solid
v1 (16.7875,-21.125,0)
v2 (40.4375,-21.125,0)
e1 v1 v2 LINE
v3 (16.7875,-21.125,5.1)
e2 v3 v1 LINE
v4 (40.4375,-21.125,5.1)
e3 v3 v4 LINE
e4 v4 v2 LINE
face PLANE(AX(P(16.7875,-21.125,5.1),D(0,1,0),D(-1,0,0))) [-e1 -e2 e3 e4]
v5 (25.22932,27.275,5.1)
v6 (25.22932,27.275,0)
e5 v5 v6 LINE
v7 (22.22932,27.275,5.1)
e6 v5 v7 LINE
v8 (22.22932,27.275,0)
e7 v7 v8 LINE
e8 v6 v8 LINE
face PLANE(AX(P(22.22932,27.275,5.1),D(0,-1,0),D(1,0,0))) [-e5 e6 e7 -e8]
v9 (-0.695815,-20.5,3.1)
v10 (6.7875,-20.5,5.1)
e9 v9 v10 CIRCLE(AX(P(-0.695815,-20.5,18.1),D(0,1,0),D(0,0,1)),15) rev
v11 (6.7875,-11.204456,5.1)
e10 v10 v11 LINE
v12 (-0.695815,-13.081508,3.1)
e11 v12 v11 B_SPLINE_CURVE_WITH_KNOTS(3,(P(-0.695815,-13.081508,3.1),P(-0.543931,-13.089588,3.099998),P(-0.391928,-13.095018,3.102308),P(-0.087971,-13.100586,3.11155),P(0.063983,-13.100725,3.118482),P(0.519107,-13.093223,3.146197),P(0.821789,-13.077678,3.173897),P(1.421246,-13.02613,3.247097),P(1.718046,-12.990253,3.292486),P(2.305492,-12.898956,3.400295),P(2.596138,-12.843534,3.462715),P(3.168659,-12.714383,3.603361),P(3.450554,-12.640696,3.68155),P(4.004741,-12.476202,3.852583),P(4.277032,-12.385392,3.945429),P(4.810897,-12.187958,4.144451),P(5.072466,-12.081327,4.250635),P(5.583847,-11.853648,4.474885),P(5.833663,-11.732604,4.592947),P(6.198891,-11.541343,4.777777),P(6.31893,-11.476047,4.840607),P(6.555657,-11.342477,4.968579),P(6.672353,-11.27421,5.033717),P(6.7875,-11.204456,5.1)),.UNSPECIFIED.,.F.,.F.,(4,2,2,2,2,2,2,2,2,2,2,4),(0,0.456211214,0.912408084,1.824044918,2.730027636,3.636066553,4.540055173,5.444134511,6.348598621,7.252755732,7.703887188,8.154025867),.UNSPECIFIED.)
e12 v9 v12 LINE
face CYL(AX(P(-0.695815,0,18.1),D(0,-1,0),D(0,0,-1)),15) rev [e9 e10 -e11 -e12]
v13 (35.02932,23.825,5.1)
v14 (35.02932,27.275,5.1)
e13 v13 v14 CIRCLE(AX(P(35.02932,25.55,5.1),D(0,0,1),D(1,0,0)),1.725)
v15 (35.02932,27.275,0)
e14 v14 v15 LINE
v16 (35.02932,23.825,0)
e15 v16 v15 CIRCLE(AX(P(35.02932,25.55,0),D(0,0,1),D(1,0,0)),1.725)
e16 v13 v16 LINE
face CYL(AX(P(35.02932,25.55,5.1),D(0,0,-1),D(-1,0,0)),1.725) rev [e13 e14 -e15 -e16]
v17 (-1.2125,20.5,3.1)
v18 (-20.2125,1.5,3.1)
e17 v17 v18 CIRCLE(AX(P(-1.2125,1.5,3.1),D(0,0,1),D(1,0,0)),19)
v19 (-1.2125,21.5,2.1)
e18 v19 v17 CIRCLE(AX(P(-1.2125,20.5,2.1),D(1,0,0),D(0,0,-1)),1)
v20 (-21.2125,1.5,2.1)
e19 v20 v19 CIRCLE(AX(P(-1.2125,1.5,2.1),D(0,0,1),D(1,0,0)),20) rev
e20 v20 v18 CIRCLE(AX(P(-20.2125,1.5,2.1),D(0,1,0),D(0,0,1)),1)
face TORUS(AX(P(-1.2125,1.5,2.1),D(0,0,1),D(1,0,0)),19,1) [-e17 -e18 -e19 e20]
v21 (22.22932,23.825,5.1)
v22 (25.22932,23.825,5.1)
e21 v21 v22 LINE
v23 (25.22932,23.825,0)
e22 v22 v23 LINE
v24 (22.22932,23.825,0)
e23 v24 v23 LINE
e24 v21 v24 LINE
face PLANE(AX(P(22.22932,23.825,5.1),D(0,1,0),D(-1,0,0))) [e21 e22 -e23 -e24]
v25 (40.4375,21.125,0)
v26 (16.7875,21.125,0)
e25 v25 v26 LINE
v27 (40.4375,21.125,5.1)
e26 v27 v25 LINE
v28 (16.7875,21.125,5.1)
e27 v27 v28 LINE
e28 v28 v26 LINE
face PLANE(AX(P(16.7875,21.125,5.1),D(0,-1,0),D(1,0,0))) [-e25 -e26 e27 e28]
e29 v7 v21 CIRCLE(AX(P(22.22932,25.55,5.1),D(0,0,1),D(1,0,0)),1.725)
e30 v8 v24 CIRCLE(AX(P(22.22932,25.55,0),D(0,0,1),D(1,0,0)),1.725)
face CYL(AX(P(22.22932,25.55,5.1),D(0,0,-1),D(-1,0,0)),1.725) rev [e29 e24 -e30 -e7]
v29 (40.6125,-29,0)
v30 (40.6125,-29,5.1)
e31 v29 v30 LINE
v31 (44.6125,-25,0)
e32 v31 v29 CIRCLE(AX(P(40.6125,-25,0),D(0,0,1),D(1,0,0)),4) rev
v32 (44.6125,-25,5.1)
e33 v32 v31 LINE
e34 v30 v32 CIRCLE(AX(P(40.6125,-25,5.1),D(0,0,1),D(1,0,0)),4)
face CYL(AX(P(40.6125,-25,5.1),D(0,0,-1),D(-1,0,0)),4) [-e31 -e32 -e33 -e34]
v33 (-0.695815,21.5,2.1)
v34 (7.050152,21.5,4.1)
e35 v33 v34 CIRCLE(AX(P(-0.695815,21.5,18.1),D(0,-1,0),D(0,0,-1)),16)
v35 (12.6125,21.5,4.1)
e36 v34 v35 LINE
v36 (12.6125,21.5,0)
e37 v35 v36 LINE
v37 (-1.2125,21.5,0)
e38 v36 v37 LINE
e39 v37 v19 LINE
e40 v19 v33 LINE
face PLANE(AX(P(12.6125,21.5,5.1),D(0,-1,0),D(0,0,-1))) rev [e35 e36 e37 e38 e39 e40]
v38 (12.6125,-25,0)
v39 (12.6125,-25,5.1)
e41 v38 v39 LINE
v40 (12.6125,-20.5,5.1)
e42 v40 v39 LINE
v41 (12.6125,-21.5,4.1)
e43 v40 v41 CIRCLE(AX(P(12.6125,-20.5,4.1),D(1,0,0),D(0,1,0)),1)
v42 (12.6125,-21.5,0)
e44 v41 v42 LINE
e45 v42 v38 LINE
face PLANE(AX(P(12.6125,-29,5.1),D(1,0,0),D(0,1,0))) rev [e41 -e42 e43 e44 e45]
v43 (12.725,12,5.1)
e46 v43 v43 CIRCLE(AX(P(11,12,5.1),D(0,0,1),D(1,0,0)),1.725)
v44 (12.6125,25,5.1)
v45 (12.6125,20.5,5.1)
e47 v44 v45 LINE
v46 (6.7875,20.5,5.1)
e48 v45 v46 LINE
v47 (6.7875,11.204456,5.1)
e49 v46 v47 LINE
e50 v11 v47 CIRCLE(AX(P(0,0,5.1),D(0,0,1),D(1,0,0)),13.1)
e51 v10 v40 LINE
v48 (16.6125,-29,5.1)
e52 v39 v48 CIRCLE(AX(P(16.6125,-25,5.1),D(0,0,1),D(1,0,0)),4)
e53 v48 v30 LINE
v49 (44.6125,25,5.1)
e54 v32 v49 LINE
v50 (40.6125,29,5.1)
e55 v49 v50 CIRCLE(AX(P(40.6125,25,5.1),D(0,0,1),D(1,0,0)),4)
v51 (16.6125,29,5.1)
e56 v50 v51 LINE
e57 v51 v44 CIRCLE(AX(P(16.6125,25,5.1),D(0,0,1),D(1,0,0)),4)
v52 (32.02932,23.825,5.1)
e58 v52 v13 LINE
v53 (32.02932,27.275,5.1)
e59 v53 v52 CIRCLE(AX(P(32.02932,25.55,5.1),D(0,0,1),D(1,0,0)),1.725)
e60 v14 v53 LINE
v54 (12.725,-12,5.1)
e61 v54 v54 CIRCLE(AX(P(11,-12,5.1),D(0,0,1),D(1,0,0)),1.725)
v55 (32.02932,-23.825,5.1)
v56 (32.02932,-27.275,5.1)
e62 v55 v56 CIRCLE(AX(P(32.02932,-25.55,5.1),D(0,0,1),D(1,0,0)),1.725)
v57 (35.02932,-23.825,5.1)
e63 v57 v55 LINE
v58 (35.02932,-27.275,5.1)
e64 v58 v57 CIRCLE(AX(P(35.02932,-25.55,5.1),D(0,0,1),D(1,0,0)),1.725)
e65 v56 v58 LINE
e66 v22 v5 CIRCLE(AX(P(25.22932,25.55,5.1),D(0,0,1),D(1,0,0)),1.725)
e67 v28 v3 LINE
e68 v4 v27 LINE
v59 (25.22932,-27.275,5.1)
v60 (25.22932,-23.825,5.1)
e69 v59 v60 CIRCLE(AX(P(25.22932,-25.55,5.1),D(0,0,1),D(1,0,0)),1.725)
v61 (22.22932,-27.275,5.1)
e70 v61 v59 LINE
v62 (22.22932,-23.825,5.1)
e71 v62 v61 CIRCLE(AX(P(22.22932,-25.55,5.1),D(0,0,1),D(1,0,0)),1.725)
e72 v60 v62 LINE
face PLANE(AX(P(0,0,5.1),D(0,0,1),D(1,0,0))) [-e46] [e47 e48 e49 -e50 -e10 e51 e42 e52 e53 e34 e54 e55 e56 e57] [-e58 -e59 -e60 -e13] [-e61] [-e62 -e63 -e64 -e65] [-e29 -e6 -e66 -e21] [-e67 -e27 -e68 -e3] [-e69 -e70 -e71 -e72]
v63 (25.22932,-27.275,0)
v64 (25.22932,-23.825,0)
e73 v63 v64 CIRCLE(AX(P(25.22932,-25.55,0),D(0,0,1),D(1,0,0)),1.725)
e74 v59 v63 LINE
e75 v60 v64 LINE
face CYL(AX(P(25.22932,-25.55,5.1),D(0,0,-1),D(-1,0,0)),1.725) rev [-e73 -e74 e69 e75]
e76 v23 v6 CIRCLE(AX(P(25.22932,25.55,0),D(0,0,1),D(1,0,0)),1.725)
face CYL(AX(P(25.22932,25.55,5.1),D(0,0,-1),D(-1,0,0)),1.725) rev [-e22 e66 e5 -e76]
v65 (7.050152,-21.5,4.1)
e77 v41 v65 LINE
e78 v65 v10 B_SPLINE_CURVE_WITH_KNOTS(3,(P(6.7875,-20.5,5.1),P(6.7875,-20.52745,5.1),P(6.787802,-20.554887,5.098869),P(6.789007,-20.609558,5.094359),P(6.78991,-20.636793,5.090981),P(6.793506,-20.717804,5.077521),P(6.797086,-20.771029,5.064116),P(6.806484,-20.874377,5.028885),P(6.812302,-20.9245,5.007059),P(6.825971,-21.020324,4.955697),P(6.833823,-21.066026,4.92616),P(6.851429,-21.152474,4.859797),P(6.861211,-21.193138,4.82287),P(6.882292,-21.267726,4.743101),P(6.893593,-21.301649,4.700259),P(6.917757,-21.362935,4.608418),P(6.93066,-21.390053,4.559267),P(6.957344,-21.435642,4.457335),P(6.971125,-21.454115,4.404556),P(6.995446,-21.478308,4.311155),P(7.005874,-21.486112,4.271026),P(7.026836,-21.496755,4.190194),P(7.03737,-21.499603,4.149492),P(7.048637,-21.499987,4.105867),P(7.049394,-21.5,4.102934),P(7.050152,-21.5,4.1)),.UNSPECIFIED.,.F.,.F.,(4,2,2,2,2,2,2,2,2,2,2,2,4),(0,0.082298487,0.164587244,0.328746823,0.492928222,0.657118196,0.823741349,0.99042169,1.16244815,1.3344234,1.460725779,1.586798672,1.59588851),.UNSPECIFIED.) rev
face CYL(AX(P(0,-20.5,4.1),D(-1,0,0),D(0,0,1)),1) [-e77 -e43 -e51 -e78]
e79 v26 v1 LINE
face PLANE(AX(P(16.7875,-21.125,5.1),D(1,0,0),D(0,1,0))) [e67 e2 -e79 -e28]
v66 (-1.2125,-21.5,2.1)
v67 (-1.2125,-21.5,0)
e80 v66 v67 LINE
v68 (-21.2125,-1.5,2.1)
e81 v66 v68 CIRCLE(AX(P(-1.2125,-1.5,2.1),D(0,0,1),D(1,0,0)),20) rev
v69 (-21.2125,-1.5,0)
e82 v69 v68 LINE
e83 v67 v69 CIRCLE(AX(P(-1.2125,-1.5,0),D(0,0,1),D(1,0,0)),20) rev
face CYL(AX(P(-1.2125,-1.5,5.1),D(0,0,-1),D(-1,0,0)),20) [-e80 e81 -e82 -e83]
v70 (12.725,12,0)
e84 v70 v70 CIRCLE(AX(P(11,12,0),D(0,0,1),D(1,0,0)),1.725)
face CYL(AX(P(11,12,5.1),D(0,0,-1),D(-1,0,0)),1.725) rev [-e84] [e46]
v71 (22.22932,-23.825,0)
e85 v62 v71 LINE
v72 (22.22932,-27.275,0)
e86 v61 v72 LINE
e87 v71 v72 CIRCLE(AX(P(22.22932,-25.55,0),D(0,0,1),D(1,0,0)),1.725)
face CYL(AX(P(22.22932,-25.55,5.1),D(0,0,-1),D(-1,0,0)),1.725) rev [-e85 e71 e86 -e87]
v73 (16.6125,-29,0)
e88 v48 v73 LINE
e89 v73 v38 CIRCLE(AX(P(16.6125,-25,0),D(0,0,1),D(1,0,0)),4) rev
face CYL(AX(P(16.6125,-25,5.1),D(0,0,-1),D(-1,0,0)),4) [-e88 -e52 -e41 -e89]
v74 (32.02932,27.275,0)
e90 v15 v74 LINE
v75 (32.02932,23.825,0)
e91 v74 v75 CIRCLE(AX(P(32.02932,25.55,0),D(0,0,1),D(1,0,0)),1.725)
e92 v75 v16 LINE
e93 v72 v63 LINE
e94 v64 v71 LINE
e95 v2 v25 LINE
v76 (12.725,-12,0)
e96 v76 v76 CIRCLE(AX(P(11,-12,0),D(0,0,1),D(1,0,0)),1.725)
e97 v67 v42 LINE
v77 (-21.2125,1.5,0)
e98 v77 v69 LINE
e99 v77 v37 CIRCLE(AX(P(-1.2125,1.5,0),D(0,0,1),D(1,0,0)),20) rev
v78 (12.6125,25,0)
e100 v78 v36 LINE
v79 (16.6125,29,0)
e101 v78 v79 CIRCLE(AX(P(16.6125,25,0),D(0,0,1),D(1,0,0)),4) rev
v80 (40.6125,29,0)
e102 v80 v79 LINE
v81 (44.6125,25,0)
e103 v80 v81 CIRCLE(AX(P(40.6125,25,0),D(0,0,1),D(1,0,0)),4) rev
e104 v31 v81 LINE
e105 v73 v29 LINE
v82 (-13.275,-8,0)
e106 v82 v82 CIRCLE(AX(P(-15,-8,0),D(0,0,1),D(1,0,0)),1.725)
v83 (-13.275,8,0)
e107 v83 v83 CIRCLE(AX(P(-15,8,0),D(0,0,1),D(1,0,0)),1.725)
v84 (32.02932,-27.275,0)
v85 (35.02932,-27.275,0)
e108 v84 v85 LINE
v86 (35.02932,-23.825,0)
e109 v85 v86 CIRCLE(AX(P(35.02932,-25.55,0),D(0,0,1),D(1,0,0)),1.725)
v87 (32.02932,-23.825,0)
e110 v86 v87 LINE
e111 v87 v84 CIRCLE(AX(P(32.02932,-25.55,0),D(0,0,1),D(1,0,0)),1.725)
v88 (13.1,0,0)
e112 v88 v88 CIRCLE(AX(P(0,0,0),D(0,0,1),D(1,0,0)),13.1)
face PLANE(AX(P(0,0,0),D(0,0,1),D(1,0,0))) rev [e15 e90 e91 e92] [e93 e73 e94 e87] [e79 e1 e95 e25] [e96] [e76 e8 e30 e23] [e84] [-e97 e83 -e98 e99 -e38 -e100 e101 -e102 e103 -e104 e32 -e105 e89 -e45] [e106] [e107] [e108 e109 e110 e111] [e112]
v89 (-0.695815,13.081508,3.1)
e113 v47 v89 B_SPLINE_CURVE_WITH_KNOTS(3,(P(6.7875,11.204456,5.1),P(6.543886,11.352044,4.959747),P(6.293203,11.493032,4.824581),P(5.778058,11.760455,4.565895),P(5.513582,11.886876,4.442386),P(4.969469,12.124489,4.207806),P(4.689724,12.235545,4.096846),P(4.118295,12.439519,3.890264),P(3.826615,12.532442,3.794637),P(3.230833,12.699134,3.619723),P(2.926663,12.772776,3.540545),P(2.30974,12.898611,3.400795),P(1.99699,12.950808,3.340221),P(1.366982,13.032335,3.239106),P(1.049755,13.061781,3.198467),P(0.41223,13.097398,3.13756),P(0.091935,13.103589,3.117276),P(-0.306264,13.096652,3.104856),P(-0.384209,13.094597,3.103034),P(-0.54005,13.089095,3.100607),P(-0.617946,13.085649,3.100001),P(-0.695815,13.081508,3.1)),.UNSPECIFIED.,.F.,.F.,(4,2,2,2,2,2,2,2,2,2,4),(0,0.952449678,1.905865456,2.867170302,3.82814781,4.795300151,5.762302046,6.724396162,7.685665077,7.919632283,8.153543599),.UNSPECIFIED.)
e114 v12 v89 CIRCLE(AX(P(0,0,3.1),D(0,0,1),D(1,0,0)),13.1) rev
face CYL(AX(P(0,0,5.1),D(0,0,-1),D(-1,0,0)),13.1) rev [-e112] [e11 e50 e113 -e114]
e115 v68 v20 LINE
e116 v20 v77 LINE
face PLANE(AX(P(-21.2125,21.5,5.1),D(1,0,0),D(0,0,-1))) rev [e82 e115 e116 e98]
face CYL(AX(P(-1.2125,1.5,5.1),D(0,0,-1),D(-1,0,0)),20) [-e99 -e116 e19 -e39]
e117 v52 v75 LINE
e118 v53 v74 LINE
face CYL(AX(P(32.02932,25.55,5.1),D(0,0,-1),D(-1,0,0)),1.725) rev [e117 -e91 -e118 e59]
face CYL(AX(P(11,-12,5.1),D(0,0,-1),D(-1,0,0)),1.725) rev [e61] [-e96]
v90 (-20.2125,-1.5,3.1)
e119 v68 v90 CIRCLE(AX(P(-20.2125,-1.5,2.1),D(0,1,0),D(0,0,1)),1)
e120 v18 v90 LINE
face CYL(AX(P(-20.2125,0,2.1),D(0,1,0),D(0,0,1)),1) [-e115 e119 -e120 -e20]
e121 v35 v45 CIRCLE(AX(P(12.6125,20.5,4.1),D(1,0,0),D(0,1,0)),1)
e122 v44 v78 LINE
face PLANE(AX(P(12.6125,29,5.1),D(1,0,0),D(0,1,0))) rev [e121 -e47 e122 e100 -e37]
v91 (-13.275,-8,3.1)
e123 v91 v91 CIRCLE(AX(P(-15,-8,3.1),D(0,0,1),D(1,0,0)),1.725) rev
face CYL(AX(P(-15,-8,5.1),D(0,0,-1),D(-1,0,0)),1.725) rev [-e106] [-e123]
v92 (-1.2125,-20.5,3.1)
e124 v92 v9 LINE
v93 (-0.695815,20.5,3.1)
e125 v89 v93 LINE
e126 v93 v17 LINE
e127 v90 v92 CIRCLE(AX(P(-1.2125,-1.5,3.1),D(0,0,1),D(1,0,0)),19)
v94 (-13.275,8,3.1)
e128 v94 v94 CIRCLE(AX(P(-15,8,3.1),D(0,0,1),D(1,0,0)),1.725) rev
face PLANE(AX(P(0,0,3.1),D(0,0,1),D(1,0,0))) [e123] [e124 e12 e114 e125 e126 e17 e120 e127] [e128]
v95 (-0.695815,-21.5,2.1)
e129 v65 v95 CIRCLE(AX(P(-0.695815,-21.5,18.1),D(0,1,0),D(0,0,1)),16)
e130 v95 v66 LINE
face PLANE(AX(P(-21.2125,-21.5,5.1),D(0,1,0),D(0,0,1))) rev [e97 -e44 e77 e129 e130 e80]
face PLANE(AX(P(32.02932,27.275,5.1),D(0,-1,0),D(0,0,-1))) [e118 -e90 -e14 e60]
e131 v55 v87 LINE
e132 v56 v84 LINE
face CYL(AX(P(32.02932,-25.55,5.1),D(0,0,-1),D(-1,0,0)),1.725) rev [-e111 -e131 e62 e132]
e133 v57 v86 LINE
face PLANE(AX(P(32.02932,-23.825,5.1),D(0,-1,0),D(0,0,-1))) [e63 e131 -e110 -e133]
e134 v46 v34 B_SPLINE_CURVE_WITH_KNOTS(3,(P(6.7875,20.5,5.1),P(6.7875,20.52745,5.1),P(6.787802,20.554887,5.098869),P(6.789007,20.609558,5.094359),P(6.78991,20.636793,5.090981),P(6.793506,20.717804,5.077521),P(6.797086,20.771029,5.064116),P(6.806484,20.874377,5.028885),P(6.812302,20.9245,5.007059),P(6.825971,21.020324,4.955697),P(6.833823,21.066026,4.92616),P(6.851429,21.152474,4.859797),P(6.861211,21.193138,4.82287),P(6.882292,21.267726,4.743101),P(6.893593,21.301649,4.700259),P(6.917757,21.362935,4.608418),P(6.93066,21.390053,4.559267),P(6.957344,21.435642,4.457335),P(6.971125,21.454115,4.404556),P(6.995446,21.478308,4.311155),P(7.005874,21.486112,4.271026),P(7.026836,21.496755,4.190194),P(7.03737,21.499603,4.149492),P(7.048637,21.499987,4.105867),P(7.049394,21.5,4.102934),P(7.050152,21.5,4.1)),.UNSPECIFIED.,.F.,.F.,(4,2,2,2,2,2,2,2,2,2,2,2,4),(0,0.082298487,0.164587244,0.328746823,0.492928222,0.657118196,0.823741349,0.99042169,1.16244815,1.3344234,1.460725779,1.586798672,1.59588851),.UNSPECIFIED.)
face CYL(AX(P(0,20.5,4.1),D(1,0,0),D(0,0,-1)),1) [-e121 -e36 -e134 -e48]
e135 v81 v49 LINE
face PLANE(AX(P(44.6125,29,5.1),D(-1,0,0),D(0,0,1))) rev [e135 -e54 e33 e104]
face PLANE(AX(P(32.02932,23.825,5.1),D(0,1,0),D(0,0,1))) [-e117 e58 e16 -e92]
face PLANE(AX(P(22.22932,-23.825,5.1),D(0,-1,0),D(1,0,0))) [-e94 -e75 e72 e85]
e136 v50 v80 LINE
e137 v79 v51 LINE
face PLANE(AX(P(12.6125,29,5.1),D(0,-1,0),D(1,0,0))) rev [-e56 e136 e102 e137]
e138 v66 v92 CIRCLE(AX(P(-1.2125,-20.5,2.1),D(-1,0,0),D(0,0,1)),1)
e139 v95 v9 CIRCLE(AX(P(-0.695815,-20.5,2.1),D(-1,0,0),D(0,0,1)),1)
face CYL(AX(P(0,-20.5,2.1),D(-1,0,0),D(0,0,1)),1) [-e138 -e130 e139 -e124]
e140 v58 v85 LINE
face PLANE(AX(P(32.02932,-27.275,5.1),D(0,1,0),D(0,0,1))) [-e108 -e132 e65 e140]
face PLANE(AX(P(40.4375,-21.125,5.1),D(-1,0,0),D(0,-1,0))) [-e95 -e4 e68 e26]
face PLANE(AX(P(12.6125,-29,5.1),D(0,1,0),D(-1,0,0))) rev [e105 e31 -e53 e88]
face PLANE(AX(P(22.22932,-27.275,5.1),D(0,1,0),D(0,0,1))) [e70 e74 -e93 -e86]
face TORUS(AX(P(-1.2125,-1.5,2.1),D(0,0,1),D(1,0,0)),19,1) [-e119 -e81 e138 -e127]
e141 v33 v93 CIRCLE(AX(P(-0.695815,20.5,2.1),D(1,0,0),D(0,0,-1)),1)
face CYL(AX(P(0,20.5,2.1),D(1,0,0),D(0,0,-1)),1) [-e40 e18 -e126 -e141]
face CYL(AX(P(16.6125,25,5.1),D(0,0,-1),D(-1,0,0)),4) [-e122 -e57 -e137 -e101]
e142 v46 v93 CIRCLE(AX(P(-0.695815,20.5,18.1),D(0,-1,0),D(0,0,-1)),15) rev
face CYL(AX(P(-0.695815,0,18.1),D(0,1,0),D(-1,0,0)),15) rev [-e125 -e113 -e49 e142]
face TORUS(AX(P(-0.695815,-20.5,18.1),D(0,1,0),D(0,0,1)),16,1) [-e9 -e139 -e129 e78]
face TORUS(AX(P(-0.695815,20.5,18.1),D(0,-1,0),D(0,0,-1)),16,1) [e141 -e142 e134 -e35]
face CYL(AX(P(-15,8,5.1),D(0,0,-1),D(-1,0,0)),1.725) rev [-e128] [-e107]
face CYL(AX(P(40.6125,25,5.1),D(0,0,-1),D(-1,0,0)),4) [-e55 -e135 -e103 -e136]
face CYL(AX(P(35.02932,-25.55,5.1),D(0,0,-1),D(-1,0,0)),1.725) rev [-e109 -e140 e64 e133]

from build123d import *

# Parameters (mm, degrees)
SKETCH1_R           = 1.725
SKETCH1_R_2         = 13.1
SKETCH1_W           = 23.65
SKETCH1_H           = 42.25
BOSS_EXTRUDE1_DEPTH = 5.1
CUT_EXTRUDE1_START  = -2
SKETCH2_R           = 1.725
CUT_EXTRUDE1_DEPTH  = 2
FILLET1_R           = 4
FILLET2_R           = 20
FILLET3_R           = 15
FILLET4_R           = 1


with BuildPart() as part:
    # Sketch1 → Boss-Extrude1 (new body)
    with BuildSketch(Plane.XY):
        Polygon((12.6125, 29), (12.6125, 21.5), (-21.2125, 21.5), (-21.2125, -21.5), (12.6125, -21.5), (12.6125, -29), (44.6125, -29), (44.6125, 29), align=None)
        with Locations((-15, -8)):
            Circle(SKETCH1_R, mode=Mode.SUBTRACT)
        with Locations((-15, 8)):
            Circle(SKETCH1_R, mode=Mode.SUBTRACT)
        with Locations((11, 12)):
            Circle(SKETCH1_R, mode=Mode.SUBTRACT)
        with Locations((11, -12)):
            Circle(SKETCH1_R, mode=Mode.SUBTRACT)
        Circle(SKETCH1_R_2, mode=Mode.SUBTRACT)
        with BuildLine():
            Line((22.229319933, 27.275), (25.229319933, 27.275))
            ThreePointArc((25.229319933, 27.275), (26.954319933, 25.55), (25.229319933, 23.825))
            Line((25.229319933, 23.825), (22.229319933, 23.825))
            ThreePointArc((22.229319933, 23.825), (20.504319933, 25.55), (22.229319933, 27.275))
        make_face(mode=Mode.SUBTRACT)
        with BuildLine():
            Line((32.029319933, 27.275), (35.029319933, 27.275))
            ThreePointArc((35.029319933, 27.275), (36.754319933, 25.55), (35.029319933, 23.825))
            Line((35.029319933, 23.825), (32.029319933, 23.825))
            ThreePointArc((32.029319933, 23.825), (30.304319933, 25.55), (32.029319933, 27.275))
        make_face(mode=Mode.SUBTRACT)
        with BuildLine():
            Line((22.229319933, -23.825), (25.229319933, -23.825))
            ThreePointArc((25.229319933, -23.825), (26.954319933, -25.55), (25.229319933, -27.275))
            Line((25.229319933, -27.275), (22.229319933, -27.275))
            ThreePointArc((22.229319933, -27.275), (20.504319933, -25.55), (22.229319933, -23.825))
        make_face(mode=Mode.SUBTRACT)
        with BuildLine():
            Line((32.029319933, -23.825), (35.029319933, -23.825))
            ThreePointArc((35.029319933, -23.825), (36.754319933, -25.55), (35.029319933, -27.275))
            Line((35.029319933, -27.275), (32.029319933, -27.275))
            ThreePointArc((32.029319933, -27.275), (30.304319933, -25.55), (32.029319933, -23.825))
        make_face(mode=Mode.SUBTRACT)
        with Locations((28.6125, 0)):
            Rectangle(SKETCH1_W, SKETCH1_H, mode=Mode.SUBTRACT)
    extrude(amount=BOSS_EXTRUDE1_DEPTH)

    # Sketch2 → Cut-Extrude1 (cut)
    with BuildSketch(Plane.XY.offset(5.1).offset(CUT_EXTRUDE1_START)):
        with BuildLine():
            Line((6.7875, 11.204456424), (6.7875, 21.5))
            Line((6.7875, 21.5), (-21.2125, 21.5))
            Line((-21.2125, 21.5), (-21.2125, -21.5))
            Line((-21.2125, -21.5), (6.7875, -21.5))
            Line((6.7875, -21.5), (6.7875, -11.204456424))
            ThreePointArc((6.7875, -11.204456424), (-13.1, 0), (6.7875, 11.204456424))
        make_face()
        with Locations((-15, -8)):
            Circle(SKETCH2_R, mode=Mode.SUBTRACT)
        with Locations((-15, 8)):
            Circle(SKETCH2_R, mode=Mode.SUBTRACT)
    extrude(amount=CUT_EXTRUDE1_DEPTH, mode=Mode.SUBTRACT)

    # Fillet1
    fillet1_edges = [part.edges().sort_by_distance(p)[0] for p in [
        (12.6125, 29, 2.55),
        (44.6125, 29, 2.55),
        (44.6125, -29, 2.55),
        (12.6125, -29, 2.55),
    ]]
    fillet(fillet1_edges, radius=FILLET1_R)

    # Fillet2
    fillet2_edges = [part.edges().sort_by_distance(p)[0] for p in [
        (-21.2125, -21.5, 1.55),
        (-21.2125, 21.5, 1.55),
    ]]
    fillet(fillet2_edges, radius=FILLET2_R)

    # Fillet3
    # the kernel refuses this fillet: 15 mm, written as the material it adds along each edge
    with BuildSketch(Plane(origin=(6.7875, -21.5, 3.1), x_dir=(-1, 0, 0), z_dir=(0, 1, 0))) as fillet3_piece_1_section:
        with BuildLine():
            CenterArc((7.483314774, 15), FILLET3_R, 240.073565133, 29.926434867)
            Line((0, 2), (-0.149666295, 1.74))
            ThreePointArc((-0.149666295, 1.74), (-0.3, 1), (-0.3, 0))
            Line((-0.3, 0), (0, -0.3))
            Line((0, -0.3), (7.483314774, -0.3))
            Line((7.483314774, -0.3), (7.483314774, 0))
        make_face()
    fillet3_piece_1 = extrude(amount=29.00383051, mode=Mode.PRIVATE)
    fillet3_piece_1 = fillet3_piece_1 - Plane(origin=(0, 0, 3.507090061), x_dir=(1, 0, 0), z_dir=(0, 0, -1)) * Cylinder(13.1, 88, mode=Mode.PRIVATE)
    add(fillet3_piece_1)
    with BuildSketch(Plane(origin=(6.7875, -7.50383051, 3.1), x_dir=(-1, 0, 0), z_dir=(0, 1, 0))) as fillet3_piece_2_section:
        with BuildLine():
            CenterArc((7.483314774, 15), FILLET3_R, 240.073565133, 29.926434867)
            Line((0, 2), (-0.149666295, 1.74))
            ThreePointArc((-0.149666295, 1.74), (-0.3, 1), (-0.3, 0))
            Line((-0.3, 0), (0, -0.3))
            Line((0, -0.3), (7.483314774, -0.3))
            Line((7.483314774, -0.3), (7.483314774, 0))
        make_face()
    fillet3_piece_2 = extrude(amount=29.00383051, mode=Mode.PRIVATE)
    fillet3_piece_2 = fillet3_piece_2 - Plane(origin=(0, 0, 3.507090028), x_dir=(1, 0, 0), z_dir=(0, 0, -1)) * Cylinder(13.1, 88, mode=Mode.PRIVATE)
    add(fillet3_piece_2)

    # Fillet4
    # the kernel refuses this fillet: 1 mm, written as the material it takes off along each edge
    with BuildSketch(Plane(origin=(4.2875, -21.5, 5.1), x_dir=(0, 1, 0), z_dir=(1, 0, 0)), Plane(origin=(12.6125, 21.5, 5.1), x_dir=(0, -1, 0), z_dir=(-1, 0, 0))) as fillet4_piece_1:
        with BuildLine():
            CenterArc((FILLET4_R, -FILLET4_R), FILLET4_R, 90, 90)
            Line((0, -FILLET4_R), (0, 0))
            Line((0, 0), (FILLET4_R, 0))
        make_face()
    extrude(amount=8.325, mode=Mode.SUBTRACT)
    with BuildSketch(Plane(origin=(-1.2125, -21.5, 3.1), x_dir=(0, 1, 0), z_dir=(1, 0, 0)), Plane(origin=(-0.695814774, 21.5, 3.1), x_dir=(0, -1, 0), z_dir=(-1, 0, 0))) as fillet4_piece_2:
        with BuildLine():
            CenterArc((FILLET4_R, -FILLET4_R), FILLET4_R, 90, 90)
            Line((0, -FILLET4_R), (0, 0))
            Line((0, 0), (FILLET4_R, 0))
        make_face()
    extrude(amount=0.516685226, mode=Mode.SUBTRACT)
    with BuildSketch(Plane(origin=(-21.2125, 1.5, 3.1), x_dir=(1, 0, 0), z_dir=(0, -1, 0))) as fillet4_piece_3:
        with BuildLine():
            CenterArc((FILLET4_R, -FILLET4_R), FILLET4_R, 90, 90)
            Line((0, -FILLET4_R), (0, 0))
            Line((0, 0), (FILLET4_R, 0))
        make_face()
    extrude(amount=3, mode=Mode.SUBTRACT)
    with BuildSketch(Plane(origin=(-1.2125, 1.5, 3.1), x_dir=(0, 1, 0), z_dir=(1, 0, 0))) as fillet4_piece_4:
        with BuildLine():
            CenterArc((20 - FILLET4_R, -FILLET4_R), FILLET4_R, 0, 90)
            Line((20, -FILLET4_R), (20, 0))
            Line((20, 0), (20 - FILLET4_R, 0))
        make_face()
    revolve(axis=Axis((-1.2125, 1.5, 3.1), (0, 0, 1)), revolution_arc=90, mode=Mode.SUBTRACT)
    with BuildSketch(Plane(origin=(-1.2125, -1.5, 3.1), x_dir=(-1, 0, 0), z_dir=(0, 1, 0))) as fillet4_piece_5:
        with BuildLine():
            CenterArc((20 - FILLET4_R, -FILLET4_R), FILLET4_R, 0, 90)
            Line((20, -FILLET4_R), (20, 0))
            Line((20, 0), (20 - FILLET4_R, 0))
        make_face()
    revolve(axis=Axis((-1.2125, -1.5, 3.1), (0, 0, 1)), revolution_arc=90, mode=Mode.SUBTRACT)
    with BuildSketch(Plane(origin=(-0.695814774, -21.5, 18.1), x_dir=(0.6357570418169636, 0, -0.7718892302527245), z_dir=(0.7718892302527245, 0, 0.6357570418169636))) as fillet4_piece_6:
        with BuildLine():
            CenterArc((15 + FILLET4_R, FILLET4_R), FILLET4_R, 180, 90)
            Line((15 + FILLET4_R, 0), (15, 0))
            Line((15, 0), (15, FILLET4_R))
        make_face()
    revolve(axis=Axis((-0.695814774, -21.5, 18.1), (0, 1, 0)), revolution_arc=39.476155484, mode=Mode.SUBTRACT)
    with BuildSketch(Plane(origin=(-0.695814774, 21.5, 18.1), x_dir=(0.6357570418169636, 0, -0.7718892302527245), z_dir=(0.7718892302527245, 0, 0.6357570418169636))) as fillet4_piece_7:
        with BuildLine():
            CenterArc((15 + FILLET4_R, -FILLET4_R), FILLET4_R, 90, 90)
            Line((15 + FILLET4_R, 0), (15, 0))
            Line((15, 0), (15, -FILLET4_R))
        make_face()
    revolve(axis=Axis((-0.695814774, 21.5, 18.1), (0, 1, 0)), revolution_arc=39.476155484, mode=Mode.SUBTRACT)


solid = part.part
